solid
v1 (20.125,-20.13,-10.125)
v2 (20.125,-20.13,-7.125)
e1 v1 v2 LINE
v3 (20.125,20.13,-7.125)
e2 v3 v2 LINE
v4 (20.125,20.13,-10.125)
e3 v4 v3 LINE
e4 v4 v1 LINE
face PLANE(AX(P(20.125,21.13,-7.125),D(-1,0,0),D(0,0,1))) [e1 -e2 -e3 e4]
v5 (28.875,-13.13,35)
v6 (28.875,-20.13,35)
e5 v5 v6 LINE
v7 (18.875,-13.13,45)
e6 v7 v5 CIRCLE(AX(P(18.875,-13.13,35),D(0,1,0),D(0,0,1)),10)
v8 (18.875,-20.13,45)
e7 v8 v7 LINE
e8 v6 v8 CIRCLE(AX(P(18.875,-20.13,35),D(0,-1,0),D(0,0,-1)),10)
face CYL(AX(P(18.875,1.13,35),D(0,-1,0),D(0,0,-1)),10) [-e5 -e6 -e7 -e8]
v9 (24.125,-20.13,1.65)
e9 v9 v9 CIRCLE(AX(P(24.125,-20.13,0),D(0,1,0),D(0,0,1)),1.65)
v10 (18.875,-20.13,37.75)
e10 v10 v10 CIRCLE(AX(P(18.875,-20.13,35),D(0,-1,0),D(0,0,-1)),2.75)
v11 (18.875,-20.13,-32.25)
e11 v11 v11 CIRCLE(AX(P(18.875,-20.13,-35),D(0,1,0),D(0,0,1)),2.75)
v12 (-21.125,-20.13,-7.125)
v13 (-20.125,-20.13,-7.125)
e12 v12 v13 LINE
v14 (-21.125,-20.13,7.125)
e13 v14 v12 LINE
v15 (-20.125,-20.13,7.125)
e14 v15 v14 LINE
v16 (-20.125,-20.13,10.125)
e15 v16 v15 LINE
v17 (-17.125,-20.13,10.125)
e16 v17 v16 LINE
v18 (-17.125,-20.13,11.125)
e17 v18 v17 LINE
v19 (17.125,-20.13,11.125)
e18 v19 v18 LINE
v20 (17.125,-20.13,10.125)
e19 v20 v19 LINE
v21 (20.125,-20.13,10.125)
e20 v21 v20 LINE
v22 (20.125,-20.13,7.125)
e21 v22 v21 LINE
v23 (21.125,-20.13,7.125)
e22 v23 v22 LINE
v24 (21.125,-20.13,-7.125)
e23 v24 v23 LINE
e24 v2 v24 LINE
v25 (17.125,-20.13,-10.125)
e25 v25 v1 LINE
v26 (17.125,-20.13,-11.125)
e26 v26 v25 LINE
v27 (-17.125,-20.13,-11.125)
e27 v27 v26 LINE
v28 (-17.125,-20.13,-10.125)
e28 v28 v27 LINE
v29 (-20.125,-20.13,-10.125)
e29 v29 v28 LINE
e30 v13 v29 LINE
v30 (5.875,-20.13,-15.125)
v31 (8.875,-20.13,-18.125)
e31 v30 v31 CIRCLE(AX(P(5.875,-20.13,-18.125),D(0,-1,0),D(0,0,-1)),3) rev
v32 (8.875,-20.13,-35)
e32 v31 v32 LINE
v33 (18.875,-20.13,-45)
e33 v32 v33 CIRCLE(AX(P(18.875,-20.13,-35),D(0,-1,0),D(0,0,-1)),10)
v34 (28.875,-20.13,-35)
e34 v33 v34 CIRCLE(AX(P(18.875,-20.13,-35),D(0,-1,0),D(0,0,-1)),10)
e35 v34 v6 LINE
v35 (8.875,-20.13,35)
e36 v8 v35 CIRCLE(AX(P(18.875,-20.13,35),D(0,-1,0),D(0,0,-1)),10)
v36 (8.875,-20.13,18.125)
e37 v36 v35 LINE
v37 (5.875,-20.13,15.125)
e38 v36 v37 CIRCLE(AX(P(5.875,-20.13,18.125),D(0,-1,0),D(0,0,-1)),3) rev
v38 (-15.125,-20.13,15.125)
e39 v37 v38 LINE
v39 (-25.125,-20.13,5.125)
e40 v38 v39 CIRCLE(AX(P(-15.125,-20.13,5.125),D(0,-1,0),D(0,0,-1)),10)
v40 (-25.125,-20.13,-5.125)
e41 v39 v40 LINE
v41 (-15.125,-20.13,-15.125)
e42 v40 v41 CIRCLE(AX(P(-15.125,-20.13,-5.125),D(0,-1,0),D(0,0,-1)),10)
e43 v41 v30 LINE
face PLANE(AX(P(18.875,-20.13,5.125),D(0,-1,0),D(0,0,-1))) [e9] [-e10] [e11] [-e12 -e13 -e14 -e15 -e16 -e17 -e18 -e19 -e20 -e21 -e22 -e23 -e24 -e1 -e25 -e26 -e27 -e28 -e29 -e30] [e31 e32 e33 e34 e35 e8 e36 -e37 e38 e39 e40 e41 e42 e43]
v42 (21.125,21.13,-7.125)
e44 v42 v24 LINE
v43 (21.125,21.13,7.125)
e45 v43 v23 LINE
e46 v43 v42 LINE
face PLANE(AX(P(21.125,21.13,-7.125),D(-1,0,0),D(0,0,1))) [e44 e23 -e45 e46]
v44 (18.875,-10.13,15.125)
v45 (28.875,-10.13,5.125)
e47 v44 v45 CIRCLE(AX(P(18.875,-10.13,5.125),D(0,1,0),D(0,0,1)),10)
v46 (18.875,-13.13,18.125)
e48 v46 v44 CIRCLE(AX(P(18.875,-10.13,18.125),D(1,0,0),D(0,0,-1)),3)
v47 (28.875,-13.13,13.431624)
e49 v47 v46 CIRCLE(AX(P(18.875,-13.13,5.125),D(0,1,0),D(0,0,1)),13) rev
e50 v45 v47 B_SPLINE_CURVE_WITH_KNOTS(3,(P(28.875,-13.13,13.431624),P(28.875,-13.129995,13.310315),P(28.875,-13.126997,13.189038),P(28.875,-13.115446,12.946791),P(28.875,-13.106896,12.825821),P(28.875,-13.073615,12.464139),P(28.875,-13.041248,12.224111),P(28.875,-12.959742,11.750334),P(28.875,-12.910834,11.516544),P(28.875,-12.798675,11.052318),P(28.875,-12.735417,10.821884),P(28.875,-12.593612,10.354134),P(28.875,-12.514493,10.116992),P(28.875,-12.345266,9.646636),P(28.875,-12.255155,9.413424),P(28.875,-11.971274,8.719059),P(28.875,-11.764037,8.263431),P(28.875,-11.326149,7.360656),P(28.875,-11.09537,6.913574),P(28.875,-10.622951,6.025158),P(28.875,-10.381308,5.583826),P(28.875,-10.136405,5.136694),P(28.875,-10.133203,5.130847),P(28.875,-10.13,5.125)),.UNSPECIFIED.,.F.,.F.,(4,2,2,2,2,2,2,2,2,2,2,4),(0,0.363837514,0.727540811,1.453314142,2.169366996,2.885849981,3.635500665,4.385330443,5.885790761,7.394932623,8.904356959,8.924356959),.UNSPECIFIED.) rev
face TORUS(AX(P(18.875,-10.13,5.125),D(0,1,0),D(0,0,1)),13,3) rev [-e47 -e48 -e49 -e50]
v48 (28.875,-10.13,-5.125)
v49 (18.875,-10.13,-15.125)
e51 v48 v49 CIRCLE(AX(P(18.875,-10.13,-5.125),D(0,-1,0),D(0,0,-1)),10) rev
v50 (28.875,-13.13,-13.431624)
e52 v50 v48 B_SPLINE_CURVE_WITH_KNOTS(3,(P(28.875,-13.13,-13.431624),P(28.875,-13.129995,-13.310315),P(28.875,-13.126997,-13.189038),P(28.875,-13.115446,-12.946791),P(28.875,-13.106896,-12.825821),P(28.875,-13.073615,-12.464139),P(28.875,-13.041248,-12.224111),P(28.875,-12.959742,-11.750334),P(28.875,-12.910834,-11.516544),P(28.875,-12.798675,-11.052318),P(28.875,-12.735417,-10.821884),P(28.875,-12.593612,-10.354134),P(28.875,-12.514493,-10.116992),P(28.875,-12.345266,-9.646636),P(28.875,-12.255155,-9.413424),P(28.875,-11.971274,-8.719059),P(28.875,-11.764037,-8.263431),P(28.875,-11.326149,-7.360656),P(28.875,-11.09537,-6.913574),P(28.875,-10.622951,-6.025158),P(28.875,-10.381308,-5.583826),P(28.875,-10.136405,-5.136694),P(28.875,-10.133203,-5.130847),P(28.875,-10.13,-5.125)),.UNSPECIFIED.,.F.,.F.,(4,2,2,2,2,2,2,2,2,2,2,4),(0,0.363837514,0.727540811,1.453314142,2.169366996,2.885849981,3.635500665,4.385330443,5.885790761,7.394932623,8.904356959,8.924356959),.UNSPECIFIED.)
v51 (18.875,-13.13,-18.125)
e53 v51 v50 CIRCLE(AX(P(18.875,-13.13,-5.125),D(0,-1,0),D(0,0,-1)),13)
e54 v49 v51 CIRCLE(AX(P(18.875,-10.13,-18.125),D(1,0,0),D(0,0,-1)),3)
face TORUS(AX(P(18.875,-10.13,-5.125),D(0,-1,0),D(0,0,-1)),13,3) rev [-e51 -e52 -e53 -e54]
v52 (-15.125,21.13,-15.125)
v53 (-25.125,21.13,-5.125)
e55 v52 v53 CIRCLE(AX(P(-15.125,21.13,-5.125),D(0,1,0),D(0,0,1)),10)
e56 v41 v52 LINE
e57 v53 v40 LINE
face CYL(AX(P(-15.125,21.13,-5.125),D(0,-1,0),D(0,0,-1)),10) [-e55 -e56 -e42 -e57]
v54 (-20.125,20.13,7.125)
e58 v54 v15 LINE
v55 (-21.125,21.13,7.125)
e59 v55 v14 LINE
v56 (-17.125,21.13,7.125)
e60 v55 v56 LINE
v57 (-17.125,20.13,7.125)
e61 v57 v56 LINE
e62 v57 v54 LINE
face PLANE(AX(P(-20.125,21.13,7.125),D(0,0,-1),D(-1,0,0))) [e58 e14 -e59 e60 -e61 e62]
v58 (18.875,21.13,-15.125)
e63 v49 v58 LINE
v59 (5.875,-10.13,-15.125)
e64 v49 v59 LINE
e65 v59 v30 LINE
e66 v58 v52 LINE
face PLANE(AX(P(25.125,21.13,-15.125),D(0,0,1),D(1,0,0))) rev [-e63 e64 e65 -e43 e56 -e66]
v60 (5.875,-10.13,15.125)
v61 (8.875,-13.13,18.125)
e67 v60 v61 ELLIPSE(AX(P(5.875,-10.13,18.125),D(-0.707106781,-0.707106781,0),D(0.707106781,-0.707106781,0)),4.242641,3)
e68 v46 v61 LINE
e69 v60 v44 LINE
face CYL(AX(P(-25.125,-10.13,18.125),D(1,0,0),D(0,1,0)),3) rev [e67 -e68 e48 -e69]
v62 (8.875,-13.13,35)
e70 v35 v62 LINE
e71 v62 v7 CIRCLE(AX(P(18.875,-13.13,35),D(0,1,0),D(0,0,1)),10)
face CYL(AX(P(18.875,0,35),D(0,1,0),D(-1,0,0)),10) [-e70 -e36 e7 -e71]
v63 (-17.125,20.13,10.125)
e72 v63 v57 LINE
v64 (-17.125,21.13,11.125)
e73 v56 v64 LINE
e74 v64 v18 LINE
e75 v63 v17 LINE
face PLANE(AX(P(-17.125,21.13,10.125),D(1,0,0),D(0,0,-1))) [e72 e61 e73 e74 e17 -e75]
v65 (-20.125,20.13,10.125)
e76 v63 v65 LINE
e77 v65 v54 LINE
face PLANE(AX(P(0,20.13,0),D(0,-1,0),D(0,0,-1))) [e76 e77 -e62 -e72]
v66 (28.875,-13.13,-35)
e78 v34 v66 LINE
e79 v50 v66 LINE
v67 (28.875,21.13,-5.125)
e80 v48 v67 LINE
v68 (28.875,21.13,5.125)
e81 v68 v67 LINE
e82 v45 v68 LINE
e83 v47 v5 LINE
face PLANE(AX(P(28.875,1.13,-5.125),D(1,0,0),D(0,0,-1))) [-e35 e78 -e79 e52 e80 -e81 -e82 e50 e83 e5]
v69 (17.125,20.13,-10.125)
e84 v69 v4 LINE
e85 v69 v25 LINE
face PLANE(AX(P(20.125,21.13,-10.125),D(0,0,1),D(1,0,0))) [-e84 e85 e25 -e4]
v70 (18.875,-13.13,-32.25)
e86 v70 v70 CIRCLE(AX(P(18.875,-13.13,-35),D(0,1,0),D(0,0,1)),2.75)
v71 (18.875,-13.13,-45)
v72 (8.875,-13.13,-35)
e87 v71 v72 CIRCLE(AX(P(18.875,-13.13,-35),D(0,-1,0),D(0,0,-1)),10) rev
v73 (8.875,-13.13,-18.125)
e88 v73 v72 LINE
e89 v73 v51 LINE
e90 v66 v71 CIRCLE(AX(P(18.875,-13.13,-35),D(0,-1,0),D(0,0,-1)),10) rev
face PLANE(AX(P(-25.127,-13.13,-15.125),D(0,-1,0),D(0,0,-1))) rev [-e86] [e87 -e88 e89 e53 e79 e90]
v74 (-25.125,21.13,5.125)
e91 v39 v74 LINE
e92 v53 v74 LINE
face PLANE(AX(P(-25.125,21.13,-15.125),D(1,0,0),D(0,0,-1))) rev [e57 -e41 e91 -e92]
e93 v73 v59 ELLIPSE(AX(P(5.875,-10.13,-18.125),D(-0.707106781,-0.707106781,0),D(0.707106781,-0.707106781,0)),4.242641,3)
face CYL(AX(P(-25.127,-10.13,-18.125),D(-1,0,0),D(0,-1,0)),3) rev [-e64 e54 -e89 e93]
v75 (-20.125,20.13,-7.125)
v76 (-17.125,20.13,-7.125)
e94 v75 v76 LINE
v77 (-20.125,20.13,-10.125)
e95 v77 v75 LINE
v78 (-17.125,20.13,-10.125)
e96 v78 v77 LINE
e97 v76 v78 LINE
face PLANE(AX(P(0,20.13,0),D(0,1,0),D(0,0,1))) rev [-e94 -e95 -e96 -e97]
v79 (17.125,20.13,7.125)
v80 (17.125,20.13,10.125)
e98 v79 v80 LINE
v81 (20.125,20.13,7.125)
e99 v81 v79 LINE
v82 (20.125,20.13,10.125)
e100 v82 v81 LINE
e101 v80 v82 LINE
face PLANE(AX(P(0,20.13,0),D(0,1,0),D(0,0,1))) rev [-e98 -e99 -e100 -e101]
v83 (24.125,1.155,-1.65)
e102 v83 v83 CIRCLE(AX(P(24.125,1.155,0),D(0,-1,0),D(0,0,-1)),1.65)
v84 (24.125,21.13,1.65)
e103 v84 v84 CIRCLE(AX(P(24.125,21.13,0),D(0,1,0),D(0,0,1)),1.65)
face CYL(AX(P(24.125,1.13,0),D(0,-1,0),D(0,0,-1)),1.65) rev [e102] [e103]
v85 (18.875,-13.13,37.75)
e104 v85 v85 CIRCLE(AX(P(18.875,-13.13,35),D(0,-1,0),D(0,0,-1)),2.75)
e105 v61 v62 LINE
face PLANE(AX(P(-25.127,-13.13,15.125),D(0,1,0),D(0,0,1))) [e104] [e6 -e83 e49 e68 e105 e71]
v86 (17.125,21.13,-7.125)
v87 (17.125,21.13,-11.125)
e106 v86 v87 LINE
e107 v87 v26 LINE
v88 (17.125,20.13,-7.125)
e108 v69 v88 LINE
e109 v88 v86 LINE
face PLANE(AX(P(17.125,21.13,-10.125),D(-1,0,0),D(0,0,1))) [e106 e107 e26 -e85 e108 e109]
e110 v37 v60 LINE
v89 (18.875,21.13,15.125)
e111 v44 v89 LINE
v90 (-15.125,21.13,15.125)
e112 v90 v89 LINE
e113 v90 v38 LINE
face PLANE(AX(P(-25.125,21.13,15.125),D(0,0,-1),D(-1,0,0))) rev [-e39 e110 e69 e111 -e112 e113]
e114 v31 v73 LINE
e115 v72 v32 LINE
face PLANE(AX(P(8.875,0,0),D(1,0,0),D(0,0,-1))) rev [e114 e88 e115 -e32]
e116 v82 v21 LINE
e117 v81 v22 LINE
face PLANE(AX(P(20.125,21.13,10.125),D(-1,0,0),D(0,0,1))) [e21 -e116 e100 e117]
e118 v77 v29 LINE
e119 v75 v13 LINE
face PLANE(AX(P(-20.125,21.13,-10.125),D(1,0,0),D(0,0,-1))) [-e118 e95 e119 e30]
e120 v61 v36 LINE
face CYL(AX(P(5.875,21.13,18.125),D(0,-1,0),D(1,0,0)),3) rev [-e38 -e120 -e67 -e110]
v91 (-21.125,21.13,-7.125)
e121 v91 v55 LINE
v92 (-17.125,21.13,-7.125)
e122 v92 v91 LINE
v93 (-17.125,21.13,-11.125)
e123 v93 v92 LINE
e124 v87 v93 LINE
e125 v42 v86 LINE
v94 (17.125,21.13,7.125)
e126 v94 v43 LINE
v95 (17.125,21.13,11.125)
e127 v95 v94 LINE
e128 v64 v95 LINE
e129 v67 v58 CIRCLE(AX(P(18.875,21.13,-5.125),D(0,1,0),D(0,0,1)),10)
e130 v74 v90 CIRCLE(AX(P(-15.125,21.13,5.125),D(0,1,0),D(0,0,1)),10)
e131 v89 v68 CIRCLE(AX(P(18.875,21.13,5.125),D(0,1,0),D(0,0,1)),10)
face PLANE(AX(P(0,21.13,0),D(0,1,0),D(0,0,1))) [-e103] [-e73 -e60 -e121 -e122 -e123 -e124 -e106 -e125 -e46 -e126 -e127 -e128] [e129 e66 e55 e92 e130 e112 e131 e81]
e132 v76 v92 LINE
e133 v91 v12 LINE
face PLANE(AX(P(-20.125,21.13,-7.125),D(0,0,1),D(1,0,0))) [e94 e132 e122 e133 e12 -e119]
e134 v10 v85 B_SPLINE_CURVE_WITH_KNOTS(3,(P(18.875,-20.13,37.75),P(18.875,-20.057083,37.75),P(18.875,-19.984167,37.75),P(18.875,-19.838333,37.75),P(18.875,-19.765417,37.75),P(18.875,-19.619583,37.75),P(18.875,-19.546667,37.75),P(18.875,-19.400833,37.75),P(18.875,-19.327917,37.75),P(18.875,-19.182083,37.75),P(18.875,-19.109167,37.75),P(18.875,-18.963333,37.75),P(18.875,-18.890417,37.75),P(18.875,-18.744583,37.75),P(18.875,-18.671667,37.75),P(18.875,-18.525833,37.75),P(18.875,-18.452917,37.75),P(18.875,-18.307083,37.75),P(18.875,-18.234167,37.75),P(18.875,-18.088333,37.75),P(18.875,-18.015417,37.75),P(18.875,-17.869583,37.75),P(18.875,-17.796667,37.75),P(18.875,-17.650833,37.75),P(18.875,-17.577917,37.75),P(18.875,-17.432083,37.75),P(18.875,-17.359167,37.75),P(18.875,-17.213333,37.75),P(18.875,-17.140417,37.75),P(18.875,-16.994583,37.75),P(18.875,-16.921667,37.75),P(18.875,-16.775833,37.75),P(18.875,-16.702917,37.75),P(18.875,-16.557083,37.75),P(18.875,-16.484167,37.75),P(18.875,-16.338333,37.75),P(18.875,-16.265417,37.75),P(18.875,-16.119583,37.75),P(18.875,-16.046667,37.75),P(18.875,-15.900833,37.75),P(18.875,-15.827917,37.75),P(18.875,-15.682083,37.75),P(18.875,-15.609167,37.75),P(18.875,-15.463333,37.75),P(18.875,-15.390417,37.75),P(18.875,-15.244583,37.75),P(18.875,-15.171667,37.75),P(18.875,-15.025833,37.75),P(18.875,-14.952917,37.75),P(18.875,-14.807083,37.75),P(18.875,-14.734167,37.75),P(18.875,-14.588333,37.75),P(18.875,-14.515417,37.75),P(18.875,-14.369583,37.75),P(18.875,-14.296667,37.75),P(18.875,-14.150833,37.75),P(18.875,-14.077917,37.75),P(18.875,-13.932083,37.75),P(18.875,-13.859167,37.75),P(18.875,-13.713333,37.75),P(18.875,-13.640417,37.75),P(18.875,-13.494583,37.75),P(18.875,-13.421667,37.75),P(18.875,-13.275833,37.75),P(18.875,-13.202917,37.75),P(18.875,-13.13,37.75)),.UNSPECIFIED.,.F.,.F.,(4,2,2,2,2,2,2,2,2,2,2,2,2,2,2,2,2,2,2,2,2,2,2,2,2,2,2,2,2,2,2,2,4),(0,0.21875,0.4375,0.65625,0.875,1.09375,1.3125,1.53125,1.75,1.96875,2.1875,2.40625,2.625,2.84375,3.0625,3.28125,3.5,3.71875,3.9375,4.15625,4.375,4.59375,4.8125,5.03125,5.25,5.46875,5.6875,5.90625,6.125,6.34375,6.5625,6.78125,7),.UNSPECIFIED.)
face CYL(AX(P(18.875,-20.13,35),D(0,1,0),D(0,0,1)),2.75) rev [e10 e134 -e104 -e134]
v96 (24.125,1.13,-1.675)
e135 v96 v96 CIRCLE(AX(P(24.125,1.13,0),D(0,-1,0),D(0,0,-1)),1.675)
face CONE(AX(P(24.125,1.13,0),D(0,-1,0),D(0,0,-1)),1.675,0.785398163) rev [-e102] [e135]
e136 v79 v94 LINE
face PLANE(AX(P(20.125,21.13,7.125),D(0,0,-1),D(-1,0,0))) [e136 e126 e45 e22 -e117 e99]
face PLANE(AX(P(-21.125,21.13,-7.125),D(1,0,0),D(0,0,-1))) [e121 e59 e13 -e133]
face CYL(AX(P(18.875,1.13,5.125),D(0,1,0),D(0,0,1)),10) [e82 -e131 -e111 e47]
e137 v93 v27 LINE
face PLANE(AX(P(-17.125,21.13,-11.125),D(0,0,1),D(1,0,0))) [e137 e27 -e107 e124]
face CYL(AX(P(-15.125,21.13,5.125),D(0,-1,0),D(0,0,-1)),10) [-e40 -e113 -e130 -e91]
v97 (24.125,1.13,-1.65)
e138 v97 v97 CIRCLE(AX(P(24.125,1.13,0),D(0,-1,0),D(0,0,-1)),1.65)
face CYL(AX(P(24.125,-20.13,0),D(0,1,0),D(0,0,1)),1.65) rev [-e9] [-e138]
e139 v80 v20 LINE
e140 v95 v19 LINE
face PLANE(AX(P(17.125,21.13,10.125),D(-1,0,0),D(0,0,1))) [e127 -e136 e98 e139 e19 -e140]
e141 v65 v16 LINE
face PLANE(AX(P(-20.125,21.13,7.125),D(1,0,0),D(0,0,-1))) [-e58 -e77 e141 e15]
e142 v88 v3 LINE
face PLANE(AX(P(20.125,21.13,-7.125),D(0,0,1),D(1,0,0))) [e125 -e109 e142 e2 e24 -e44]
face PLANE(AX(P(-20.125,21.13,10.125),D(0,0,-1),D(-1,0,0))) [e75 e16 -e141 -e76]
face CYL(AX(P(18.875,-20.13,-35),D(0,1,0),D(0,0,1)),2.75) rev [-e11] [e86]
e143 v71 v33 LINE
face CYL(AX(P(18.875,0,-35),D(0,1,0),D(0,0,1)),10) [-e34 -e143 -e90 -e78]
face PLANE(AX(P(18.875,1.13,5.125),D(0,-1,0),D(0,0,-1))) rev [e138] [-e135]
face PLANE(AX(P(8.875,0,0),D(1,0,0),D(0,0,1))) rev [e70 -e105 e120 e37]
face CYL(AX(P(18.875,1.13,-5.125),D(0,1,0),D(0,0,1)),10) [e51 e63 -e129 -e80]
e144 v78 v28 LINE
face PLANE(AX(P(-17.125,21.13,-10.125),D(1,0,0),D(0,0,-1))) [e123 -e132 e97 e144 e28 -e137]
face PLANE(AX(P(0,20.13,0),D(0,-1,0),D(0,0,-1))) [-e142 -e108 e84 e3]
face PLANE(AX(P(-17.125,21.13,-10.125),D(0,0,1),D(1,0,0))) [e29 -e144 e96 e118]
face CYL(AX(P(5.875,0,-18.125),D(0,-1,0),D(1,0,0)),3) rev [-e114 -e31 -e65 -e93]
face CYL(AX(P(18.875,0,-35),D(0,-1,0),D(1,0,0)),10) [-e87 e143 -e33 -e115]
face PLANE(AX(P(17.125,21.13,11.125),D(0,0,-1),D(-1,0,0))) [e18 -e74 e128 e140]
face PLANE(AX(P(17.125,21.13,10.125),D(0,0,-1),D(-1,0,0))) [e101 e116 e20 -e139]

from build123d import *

# Parameters (mm, degrees)
BOSS_EXTRUDE1_DEPTH                   = 1
BOSS_EXTRUDE1_DEPTH_BACK              = 19
SKETCH1_W                             = 50.25
SKETCH1_H                             = 30.25
BOSS_EXTRUDE2_DEPTH                   = 30.25
BOSS_EXTRUDE3_DEPTH                   = 5
M6_CLEARANCE_HOLE1_D                  = 6.6
M6_CLEARANCE_HOLE1_CSINK_D            = 6.65
M6_CLEARANCE_HOLE1_CSINK_ANGLE        = 90
SKETCH6_W                             = 4
SKETCH6_H                             = 4
BOSS_EXTRUDE4_DEPTH                   = 1
FILLET1_R                             = 10
TAP_DRILL_FOR_M4X0_7_TAP1_D           = 3.3
TAP_DRILL_FOR_M4X0_7_TAP1_CSINK_D     = 3.35
TAP_DRILL_FOR_M4X0_7_TAP1_CSINK_ANGLE = 90
CUT_EXTRUDE1_DEPTH                    = 92.330529534
CUT_EXTRUDE1_DEPTH_BACK               = 92.330529534
SKETCH13_OUTSIDE_W                    = 121.742
SKETCH13_OUTSIDE_H                    = 131.492
BOSS_EXTRUDE5_START                   = 21.26
BOSS_EXTRUDE5_DEPTH                   = 21.26
CUT_EXTRUDE2_DEPTH                    = 53.582495662
CUT_EXTRUDE2_DEPTH_BACK               = 53.582495662
SKETCH15_R                            = 1.65
BOSS_EXTRUDE6_REACH                   = 66.778
SKETCH16_W                            = 10
SKETCH16_H                            = 7
SKETCH17_W                            = 29.875
SKETCH17_H                            = 7
BOSS_EXTRUDE7_DEPTH                   = 20
FILLET5_R                             = 10
FILLET6_R                             = 3
SKETCH19_R                            = 2.75
CUT_EXTRUDE4_DEPTH                    = 64.502072703
FILLET7_R                             = 3
FILLET8_R                             = 10


with BuildPart() as part:
    # Sketch1 → Boss-Extrude1 (new, two sides: drawn at the far end of the back side and taken through both)
    with BuildSketch(Plane(origin=(0, 20.13, 0), x_dir=(1, 0, 0), z_dir=(0, 1, 0)).offset(-BOSS_EXTRUDE1_DEPTH_BACK)):
        Rectangle(SKETCH1_W, SKETCH1_H)
        Polygon((20.125, 10.125), (17.125, 10.125), (17.125, 11.125), (-17.125, 11.125), (-17.125, 10.125), (-20.125, 10.125), (-20.125, 7.125), (-21.125, 7.125), (-21.125, -7.125), (-20.125, -7.125), (-20.125, -10.125), (-17.125, -10.125), (-17.125, -11.125), (17.125, -11.125), (17.125, -10.125), (20.125, -10.125), (20.125, -7.125), (21.125, -7.125), (21.125, 7.125), (20.125, 7.125), align=None, mode=Mode.SUBTRACT)
    extrude(amount=BOSS_EXTRUDE1_DEPTH + BOSS_EXTRUDE1_DEPTH_BACK)

    # Sketch2 → Boss-Extrude2 (add)
    with BuildSketch(Plane.XY.offset(15.125)):
        Polygon((25.125, 21.13), (45.125, 21.13), (45.125, 61.13), (65.125, 61.13), (65.125, 1.13), (25.125, 1.13), align=None)
    extrude(amount=-BOSS_EXTRUDE2_DEPTH)

    # Sketch3 → Boss-Extrude3 (add)
    with BuildSketch(Plane(origin=(0, 61.13, 0), x_dir=(1, 0, 0), z_dir=(0, 1, 0))):
        with BuildLine():
            Line((65.125, 40), (65.125, -40))
            ThreePointArc((65.125, -40), (55.125, -50), (45.125, -40))
            Line((45.125, -40), (45.125, 40))
            ThreePointArc((45.125, 40), (55.125, 50), (65.125, 40))
        make_face()
    extrude(amount=-BOSS_EXTRUDE3_DEPTH)

    # M6 Clearance Hole1 (through all)
    with Locations(Plane(origin=(0, 56.13, 0), x_dir=(-1, 0, 0), z_dir=(0, -1, 0))):
        with Locations((-55.125, -40), (-55.125, 40)):
            CounterSinkHole(M6_CLEARANCE_HOLE1_D / 2, M6_CLEARANCE_HOLE1_CSINK_D / 2, counter_sink_angle=M6_CLEARANCE_HOLE1_CSINK_ANGLE)

    # Sketch6 → Boss-Extrude4 (add)
    with BuildSketch(Plane(origin=(0, 21.13, 0), x_dir=(1, 0, 0), z_dir=(0, 1, 0))):
        with Locations((19.125, 9.125)):
            Rectangle(SKETCH6_W, SKETCH6_H)
        with Locations((19.125, -9.125)):
            Rectangle(SKETCH6_W, SKETCH6_H)
        with Locations((-19.125, -9.125)):
            Rectangle(SKETCH6_W, SKETCH6_H)
        with Locations((-19.125, 9.125)):
            Rectangle(SKETCH6_W, SKETCH6_H)
    extrude(amount=-BOSS_EXTRUDE4_DEPTH)

    # Fillet1
    fillet1_edges = [part.edges().sort_by_distance(p)[0] for p in [
        (45.125, 21.13, 0),
        (65.125, 1.13, 0),
        (55.125, 56.13, -15.125),
        (55.125, 56.13, 15.125),
        (-25.125, 11.13, 15.125),
        (-25.125, 11.13, -15.125),
    ]]
    fillet(fillet1_edges, radius=FILLET1_R)

    # Tap Drill for M4x0.7 Tap1 (through all)
    with Locations(Plane(origin=(0, 1.13, 0), x_dir=(-1, 0, 0), z_dir=(0, -1, 0))):
        with Locations((-24.125, 0)):
            CounterSinkHole(TAP_DRILL_FOR_M4X0_7_TAP1_D / 2, TAP_DRILL_FOR_M4X0_7_TAP1_CSINK_D / 2, counter_sink_angle=TAP_DRILL_FOR_M4X0_7_TAP1_CSINK_ANGLE)

    # Sketch13 outside → Cut-Extrude1 (cut, two sides: drawn at the far end of the back side and taken through both)
    with BuildSketch(Plane(origin=(0, 21.13, 0), x_dir=(1, 0, 0), z_dir=(0, 1, 0)).offset(-CUT_EXTRUDE1_DEPTH_BACK)):
        with Locations((20, 0)):
            Rectangle(SKETCH13_OUTSIDE_W, SKETCH13_OUTSIDE_H)
        with BuildLine():
            Line((28.875, 5.125), (28.875, -5.125))
            ThreePointArc((28.875, -5.125), (25.946067812, -12.196067812), (18.875, -15.125))
            Line((18.875, -15.125), (-15.125, -15.125))
            ThreePointArc((-15.125, -15.125), (-22.196067812, -12.196067812), (-25.125, -5.125))
            Line((-25.125, -5.125), (-25.125, 5.125))
            ThreePointArc((-25.125, 5.125), (-22.196067812, 12.196067812), (-15.125, 15.125))
            Line((-15.125, 15.125), (18.875, 15.125))
            ThreePointArc((18.875, 15.125), (25.946067812, 12.196067812), (28.875, 5.125))
        make_face(mode=Mode.SUBTRACT)
    extrude(amount=CUT_EXTRUDE1_DEPTH + CUT_EXTRUDE1_DEPTH_BACK, mode=Mode.SUBTRACT)

    # Sketch14 → Boss-Extrude5 (add)
    with BuildSketch(Plane.XZ.offset(-1.13).offset(BOSS_EXTRUDE5_START)):
        with BuildLine():
            Line((28.875, 5.125), (28.875, -5.125))
            ThreePointArc((28.875, -5.125), (25.946067812, -12.196067812), (18.875, -15.125))
            Line((18.875, -15.125), (-15.125, -15.125))
            ThreePointArc((-15.125, -15.125), (-22.196067812, -12.196067812), (-25.125, -5.125))
            Line((-25.125, -5.125), (-25.125, 5.125))
            ThreePointArc((-25.125, 5.125), (-22.196067812, 12.196067812), (-15.125, 15.125))
            Line((-15.125, 15.125), (18.875, 15.125))
            ThreePointArc((18.875, 15.125), (25.946067812, 12.196067812), (28.875, 5.125))
        make_face()
        Polygon((-21.125, 7.125), (-20.125, 7.125), (-20.125, 10.125), (-17.125, 10.125), (-17.125, 11.125), (17.125, 11.125), (17.125, 10.125), (20.125, 10.125), (20.125, 7.125), (21.125, 7.125), (21.125, -7.125), (20.125, -7.125), (20.125, -10.125), (17.125, -10.125), (17.125, -11.125), (-17.125, -11.125), (-17.125, -10.125), (-20.125, -10.125), (-20.125, -7.125), (-21.125, -7.125), align=None, mode=Mode.SUBTRACT)
    extrude(amount=-BOSS_EXTRUDE5_DEPTH)

    # Sketch15 → Cut-Extrude2 (cut, two sides: drawn at the far end of the back side and taken through both)
    with BuildSketch(Plane(origin=(0, 21.13, 0), x_dir=(1, 0, 0), z_dir=(0, 1, 0)).offset(-CUT_EXTRUDE2_DEPTH_BACK)):
        with Locations(Location((24.125, 0, 0), (0, 0, 90))):
            Circle(SKETCH15_R)
    extrude(amount=CUT_EXTRUDE2_DEPTH + CUT_EXTRUDE2_DEPTH_BACK, mode=Mode.SUBTRACT)

    # Sketch16 → Boss-Extrude6 (add, up to next)
    with BuildSketch(Plane(origin=(28.875, 0, 13.75), x_dir=(0, 0, 1), z_dir=(-1, 0, 0)), mode=Mode.PRIVATE) as boss_extrude6_sk1:
        with Locations((-23.875, -16.63)):
            Rectangle(SKETCH16_W, SKETCH16_H)
    boss_extrude6_tool1 = extrude(boss_extrude6_sk1.sketch, amount=BOSS_EXTRUDE6_REACH, mode=Mode.PRIVATE) - part.part
    boss_extrude6 = boss_extrude6_tool1.solids().sort_by_distance((28.875, -16.63, -10.125))[0]
    add(boss_extrude6)

    # Sketch17 → Boss-Extrude7 (add)
    with BuildSketch(Plane.ZY.offset(-28.875)):
        with Locations((-30.0625, -16.63)):
            Rectangle(SKETCH17_W, SKETCH17_H)
    boss_extrude7 = extrude(amount=BOSS_EXTRUDE7_DEPTH)

    # Fillet5
    fillet5_edges = [part.edges().sort_by_distance(p)[0] for p in [
        (8.875, -16.63, -45),
        (28.875, -16.63, -45),
    ]]
    fillet(fillet5_edges, radius=FILLET5_R - 0.0001)  # a hair under: the kernel refuses the full size

    # Fillet6
    fillet6_edges = [part.edges().sort_by_distance(p)[0] for p in [
        (25.946067812, -13.13, -12.196067812),
        (13.875, -13.13, -15.125),
        (8.875, -16.63, -15.125),
    ]]
    fillet(fillet6_edges, radius=FILLET6_R)

    # Sketch19 → Cut-Extrude4 (cut, through all)
    with BuildSketch(Plane(origin=(0, -13.13, 0), x_dir=(1, 0, 0), z_dir=(0, 1, 0))):
        with Locations(Location((18.875, 35, 0), (0, 0, 270))):
            Circle(SKETCH19_R)
    cut_extrude4 = extrude(amount=-CUT_EXTRUDE4_DEPTH, mode=Mode.SUBTRACT)

    # Mirror2: Boss-Extrude6 across plane
    add(boss_extrude6.mirror(Plane.XY))

    # Mirror4: Boss-Extrude7 across plane
    add(boss_extrude7.mirror(Plane.XY))

    # Fillet7
    fillet7_edges = [part.edges().sort_by_distance(p)[0] for p in [
        (13.875, -13.13, 15.125),
        (25.946067812, -13.13, 12.196067812),
    ]]
    fillet(fillet7_edges, radius=FILLET7_R)
    fillet7_2_edges = [part.edges().sort_by_distance(p)[0] for p in [
        (8.875, -16.63, 15.125),
    ]]
    fillet(fillet7_2_edges, radius=FILLET7_R)

    # Fillet8
    fillet8_edges = [part.edges().sort_by_distance(p)[0] for p in [
        (8.875, -16.63, 45),
        (28.875, -16.63, 45),
    ]]
    fillet(fillet8_edges, radius=FILLET8_R - 0.0001)  # a hair under: the kernel refuses the full size

    # Mirror8: Cut-Extrude4 across plane
    add(cut_extrude4.mirror(Plane.XY), mode=Mode.SUBTRACT)


solid = part.part
